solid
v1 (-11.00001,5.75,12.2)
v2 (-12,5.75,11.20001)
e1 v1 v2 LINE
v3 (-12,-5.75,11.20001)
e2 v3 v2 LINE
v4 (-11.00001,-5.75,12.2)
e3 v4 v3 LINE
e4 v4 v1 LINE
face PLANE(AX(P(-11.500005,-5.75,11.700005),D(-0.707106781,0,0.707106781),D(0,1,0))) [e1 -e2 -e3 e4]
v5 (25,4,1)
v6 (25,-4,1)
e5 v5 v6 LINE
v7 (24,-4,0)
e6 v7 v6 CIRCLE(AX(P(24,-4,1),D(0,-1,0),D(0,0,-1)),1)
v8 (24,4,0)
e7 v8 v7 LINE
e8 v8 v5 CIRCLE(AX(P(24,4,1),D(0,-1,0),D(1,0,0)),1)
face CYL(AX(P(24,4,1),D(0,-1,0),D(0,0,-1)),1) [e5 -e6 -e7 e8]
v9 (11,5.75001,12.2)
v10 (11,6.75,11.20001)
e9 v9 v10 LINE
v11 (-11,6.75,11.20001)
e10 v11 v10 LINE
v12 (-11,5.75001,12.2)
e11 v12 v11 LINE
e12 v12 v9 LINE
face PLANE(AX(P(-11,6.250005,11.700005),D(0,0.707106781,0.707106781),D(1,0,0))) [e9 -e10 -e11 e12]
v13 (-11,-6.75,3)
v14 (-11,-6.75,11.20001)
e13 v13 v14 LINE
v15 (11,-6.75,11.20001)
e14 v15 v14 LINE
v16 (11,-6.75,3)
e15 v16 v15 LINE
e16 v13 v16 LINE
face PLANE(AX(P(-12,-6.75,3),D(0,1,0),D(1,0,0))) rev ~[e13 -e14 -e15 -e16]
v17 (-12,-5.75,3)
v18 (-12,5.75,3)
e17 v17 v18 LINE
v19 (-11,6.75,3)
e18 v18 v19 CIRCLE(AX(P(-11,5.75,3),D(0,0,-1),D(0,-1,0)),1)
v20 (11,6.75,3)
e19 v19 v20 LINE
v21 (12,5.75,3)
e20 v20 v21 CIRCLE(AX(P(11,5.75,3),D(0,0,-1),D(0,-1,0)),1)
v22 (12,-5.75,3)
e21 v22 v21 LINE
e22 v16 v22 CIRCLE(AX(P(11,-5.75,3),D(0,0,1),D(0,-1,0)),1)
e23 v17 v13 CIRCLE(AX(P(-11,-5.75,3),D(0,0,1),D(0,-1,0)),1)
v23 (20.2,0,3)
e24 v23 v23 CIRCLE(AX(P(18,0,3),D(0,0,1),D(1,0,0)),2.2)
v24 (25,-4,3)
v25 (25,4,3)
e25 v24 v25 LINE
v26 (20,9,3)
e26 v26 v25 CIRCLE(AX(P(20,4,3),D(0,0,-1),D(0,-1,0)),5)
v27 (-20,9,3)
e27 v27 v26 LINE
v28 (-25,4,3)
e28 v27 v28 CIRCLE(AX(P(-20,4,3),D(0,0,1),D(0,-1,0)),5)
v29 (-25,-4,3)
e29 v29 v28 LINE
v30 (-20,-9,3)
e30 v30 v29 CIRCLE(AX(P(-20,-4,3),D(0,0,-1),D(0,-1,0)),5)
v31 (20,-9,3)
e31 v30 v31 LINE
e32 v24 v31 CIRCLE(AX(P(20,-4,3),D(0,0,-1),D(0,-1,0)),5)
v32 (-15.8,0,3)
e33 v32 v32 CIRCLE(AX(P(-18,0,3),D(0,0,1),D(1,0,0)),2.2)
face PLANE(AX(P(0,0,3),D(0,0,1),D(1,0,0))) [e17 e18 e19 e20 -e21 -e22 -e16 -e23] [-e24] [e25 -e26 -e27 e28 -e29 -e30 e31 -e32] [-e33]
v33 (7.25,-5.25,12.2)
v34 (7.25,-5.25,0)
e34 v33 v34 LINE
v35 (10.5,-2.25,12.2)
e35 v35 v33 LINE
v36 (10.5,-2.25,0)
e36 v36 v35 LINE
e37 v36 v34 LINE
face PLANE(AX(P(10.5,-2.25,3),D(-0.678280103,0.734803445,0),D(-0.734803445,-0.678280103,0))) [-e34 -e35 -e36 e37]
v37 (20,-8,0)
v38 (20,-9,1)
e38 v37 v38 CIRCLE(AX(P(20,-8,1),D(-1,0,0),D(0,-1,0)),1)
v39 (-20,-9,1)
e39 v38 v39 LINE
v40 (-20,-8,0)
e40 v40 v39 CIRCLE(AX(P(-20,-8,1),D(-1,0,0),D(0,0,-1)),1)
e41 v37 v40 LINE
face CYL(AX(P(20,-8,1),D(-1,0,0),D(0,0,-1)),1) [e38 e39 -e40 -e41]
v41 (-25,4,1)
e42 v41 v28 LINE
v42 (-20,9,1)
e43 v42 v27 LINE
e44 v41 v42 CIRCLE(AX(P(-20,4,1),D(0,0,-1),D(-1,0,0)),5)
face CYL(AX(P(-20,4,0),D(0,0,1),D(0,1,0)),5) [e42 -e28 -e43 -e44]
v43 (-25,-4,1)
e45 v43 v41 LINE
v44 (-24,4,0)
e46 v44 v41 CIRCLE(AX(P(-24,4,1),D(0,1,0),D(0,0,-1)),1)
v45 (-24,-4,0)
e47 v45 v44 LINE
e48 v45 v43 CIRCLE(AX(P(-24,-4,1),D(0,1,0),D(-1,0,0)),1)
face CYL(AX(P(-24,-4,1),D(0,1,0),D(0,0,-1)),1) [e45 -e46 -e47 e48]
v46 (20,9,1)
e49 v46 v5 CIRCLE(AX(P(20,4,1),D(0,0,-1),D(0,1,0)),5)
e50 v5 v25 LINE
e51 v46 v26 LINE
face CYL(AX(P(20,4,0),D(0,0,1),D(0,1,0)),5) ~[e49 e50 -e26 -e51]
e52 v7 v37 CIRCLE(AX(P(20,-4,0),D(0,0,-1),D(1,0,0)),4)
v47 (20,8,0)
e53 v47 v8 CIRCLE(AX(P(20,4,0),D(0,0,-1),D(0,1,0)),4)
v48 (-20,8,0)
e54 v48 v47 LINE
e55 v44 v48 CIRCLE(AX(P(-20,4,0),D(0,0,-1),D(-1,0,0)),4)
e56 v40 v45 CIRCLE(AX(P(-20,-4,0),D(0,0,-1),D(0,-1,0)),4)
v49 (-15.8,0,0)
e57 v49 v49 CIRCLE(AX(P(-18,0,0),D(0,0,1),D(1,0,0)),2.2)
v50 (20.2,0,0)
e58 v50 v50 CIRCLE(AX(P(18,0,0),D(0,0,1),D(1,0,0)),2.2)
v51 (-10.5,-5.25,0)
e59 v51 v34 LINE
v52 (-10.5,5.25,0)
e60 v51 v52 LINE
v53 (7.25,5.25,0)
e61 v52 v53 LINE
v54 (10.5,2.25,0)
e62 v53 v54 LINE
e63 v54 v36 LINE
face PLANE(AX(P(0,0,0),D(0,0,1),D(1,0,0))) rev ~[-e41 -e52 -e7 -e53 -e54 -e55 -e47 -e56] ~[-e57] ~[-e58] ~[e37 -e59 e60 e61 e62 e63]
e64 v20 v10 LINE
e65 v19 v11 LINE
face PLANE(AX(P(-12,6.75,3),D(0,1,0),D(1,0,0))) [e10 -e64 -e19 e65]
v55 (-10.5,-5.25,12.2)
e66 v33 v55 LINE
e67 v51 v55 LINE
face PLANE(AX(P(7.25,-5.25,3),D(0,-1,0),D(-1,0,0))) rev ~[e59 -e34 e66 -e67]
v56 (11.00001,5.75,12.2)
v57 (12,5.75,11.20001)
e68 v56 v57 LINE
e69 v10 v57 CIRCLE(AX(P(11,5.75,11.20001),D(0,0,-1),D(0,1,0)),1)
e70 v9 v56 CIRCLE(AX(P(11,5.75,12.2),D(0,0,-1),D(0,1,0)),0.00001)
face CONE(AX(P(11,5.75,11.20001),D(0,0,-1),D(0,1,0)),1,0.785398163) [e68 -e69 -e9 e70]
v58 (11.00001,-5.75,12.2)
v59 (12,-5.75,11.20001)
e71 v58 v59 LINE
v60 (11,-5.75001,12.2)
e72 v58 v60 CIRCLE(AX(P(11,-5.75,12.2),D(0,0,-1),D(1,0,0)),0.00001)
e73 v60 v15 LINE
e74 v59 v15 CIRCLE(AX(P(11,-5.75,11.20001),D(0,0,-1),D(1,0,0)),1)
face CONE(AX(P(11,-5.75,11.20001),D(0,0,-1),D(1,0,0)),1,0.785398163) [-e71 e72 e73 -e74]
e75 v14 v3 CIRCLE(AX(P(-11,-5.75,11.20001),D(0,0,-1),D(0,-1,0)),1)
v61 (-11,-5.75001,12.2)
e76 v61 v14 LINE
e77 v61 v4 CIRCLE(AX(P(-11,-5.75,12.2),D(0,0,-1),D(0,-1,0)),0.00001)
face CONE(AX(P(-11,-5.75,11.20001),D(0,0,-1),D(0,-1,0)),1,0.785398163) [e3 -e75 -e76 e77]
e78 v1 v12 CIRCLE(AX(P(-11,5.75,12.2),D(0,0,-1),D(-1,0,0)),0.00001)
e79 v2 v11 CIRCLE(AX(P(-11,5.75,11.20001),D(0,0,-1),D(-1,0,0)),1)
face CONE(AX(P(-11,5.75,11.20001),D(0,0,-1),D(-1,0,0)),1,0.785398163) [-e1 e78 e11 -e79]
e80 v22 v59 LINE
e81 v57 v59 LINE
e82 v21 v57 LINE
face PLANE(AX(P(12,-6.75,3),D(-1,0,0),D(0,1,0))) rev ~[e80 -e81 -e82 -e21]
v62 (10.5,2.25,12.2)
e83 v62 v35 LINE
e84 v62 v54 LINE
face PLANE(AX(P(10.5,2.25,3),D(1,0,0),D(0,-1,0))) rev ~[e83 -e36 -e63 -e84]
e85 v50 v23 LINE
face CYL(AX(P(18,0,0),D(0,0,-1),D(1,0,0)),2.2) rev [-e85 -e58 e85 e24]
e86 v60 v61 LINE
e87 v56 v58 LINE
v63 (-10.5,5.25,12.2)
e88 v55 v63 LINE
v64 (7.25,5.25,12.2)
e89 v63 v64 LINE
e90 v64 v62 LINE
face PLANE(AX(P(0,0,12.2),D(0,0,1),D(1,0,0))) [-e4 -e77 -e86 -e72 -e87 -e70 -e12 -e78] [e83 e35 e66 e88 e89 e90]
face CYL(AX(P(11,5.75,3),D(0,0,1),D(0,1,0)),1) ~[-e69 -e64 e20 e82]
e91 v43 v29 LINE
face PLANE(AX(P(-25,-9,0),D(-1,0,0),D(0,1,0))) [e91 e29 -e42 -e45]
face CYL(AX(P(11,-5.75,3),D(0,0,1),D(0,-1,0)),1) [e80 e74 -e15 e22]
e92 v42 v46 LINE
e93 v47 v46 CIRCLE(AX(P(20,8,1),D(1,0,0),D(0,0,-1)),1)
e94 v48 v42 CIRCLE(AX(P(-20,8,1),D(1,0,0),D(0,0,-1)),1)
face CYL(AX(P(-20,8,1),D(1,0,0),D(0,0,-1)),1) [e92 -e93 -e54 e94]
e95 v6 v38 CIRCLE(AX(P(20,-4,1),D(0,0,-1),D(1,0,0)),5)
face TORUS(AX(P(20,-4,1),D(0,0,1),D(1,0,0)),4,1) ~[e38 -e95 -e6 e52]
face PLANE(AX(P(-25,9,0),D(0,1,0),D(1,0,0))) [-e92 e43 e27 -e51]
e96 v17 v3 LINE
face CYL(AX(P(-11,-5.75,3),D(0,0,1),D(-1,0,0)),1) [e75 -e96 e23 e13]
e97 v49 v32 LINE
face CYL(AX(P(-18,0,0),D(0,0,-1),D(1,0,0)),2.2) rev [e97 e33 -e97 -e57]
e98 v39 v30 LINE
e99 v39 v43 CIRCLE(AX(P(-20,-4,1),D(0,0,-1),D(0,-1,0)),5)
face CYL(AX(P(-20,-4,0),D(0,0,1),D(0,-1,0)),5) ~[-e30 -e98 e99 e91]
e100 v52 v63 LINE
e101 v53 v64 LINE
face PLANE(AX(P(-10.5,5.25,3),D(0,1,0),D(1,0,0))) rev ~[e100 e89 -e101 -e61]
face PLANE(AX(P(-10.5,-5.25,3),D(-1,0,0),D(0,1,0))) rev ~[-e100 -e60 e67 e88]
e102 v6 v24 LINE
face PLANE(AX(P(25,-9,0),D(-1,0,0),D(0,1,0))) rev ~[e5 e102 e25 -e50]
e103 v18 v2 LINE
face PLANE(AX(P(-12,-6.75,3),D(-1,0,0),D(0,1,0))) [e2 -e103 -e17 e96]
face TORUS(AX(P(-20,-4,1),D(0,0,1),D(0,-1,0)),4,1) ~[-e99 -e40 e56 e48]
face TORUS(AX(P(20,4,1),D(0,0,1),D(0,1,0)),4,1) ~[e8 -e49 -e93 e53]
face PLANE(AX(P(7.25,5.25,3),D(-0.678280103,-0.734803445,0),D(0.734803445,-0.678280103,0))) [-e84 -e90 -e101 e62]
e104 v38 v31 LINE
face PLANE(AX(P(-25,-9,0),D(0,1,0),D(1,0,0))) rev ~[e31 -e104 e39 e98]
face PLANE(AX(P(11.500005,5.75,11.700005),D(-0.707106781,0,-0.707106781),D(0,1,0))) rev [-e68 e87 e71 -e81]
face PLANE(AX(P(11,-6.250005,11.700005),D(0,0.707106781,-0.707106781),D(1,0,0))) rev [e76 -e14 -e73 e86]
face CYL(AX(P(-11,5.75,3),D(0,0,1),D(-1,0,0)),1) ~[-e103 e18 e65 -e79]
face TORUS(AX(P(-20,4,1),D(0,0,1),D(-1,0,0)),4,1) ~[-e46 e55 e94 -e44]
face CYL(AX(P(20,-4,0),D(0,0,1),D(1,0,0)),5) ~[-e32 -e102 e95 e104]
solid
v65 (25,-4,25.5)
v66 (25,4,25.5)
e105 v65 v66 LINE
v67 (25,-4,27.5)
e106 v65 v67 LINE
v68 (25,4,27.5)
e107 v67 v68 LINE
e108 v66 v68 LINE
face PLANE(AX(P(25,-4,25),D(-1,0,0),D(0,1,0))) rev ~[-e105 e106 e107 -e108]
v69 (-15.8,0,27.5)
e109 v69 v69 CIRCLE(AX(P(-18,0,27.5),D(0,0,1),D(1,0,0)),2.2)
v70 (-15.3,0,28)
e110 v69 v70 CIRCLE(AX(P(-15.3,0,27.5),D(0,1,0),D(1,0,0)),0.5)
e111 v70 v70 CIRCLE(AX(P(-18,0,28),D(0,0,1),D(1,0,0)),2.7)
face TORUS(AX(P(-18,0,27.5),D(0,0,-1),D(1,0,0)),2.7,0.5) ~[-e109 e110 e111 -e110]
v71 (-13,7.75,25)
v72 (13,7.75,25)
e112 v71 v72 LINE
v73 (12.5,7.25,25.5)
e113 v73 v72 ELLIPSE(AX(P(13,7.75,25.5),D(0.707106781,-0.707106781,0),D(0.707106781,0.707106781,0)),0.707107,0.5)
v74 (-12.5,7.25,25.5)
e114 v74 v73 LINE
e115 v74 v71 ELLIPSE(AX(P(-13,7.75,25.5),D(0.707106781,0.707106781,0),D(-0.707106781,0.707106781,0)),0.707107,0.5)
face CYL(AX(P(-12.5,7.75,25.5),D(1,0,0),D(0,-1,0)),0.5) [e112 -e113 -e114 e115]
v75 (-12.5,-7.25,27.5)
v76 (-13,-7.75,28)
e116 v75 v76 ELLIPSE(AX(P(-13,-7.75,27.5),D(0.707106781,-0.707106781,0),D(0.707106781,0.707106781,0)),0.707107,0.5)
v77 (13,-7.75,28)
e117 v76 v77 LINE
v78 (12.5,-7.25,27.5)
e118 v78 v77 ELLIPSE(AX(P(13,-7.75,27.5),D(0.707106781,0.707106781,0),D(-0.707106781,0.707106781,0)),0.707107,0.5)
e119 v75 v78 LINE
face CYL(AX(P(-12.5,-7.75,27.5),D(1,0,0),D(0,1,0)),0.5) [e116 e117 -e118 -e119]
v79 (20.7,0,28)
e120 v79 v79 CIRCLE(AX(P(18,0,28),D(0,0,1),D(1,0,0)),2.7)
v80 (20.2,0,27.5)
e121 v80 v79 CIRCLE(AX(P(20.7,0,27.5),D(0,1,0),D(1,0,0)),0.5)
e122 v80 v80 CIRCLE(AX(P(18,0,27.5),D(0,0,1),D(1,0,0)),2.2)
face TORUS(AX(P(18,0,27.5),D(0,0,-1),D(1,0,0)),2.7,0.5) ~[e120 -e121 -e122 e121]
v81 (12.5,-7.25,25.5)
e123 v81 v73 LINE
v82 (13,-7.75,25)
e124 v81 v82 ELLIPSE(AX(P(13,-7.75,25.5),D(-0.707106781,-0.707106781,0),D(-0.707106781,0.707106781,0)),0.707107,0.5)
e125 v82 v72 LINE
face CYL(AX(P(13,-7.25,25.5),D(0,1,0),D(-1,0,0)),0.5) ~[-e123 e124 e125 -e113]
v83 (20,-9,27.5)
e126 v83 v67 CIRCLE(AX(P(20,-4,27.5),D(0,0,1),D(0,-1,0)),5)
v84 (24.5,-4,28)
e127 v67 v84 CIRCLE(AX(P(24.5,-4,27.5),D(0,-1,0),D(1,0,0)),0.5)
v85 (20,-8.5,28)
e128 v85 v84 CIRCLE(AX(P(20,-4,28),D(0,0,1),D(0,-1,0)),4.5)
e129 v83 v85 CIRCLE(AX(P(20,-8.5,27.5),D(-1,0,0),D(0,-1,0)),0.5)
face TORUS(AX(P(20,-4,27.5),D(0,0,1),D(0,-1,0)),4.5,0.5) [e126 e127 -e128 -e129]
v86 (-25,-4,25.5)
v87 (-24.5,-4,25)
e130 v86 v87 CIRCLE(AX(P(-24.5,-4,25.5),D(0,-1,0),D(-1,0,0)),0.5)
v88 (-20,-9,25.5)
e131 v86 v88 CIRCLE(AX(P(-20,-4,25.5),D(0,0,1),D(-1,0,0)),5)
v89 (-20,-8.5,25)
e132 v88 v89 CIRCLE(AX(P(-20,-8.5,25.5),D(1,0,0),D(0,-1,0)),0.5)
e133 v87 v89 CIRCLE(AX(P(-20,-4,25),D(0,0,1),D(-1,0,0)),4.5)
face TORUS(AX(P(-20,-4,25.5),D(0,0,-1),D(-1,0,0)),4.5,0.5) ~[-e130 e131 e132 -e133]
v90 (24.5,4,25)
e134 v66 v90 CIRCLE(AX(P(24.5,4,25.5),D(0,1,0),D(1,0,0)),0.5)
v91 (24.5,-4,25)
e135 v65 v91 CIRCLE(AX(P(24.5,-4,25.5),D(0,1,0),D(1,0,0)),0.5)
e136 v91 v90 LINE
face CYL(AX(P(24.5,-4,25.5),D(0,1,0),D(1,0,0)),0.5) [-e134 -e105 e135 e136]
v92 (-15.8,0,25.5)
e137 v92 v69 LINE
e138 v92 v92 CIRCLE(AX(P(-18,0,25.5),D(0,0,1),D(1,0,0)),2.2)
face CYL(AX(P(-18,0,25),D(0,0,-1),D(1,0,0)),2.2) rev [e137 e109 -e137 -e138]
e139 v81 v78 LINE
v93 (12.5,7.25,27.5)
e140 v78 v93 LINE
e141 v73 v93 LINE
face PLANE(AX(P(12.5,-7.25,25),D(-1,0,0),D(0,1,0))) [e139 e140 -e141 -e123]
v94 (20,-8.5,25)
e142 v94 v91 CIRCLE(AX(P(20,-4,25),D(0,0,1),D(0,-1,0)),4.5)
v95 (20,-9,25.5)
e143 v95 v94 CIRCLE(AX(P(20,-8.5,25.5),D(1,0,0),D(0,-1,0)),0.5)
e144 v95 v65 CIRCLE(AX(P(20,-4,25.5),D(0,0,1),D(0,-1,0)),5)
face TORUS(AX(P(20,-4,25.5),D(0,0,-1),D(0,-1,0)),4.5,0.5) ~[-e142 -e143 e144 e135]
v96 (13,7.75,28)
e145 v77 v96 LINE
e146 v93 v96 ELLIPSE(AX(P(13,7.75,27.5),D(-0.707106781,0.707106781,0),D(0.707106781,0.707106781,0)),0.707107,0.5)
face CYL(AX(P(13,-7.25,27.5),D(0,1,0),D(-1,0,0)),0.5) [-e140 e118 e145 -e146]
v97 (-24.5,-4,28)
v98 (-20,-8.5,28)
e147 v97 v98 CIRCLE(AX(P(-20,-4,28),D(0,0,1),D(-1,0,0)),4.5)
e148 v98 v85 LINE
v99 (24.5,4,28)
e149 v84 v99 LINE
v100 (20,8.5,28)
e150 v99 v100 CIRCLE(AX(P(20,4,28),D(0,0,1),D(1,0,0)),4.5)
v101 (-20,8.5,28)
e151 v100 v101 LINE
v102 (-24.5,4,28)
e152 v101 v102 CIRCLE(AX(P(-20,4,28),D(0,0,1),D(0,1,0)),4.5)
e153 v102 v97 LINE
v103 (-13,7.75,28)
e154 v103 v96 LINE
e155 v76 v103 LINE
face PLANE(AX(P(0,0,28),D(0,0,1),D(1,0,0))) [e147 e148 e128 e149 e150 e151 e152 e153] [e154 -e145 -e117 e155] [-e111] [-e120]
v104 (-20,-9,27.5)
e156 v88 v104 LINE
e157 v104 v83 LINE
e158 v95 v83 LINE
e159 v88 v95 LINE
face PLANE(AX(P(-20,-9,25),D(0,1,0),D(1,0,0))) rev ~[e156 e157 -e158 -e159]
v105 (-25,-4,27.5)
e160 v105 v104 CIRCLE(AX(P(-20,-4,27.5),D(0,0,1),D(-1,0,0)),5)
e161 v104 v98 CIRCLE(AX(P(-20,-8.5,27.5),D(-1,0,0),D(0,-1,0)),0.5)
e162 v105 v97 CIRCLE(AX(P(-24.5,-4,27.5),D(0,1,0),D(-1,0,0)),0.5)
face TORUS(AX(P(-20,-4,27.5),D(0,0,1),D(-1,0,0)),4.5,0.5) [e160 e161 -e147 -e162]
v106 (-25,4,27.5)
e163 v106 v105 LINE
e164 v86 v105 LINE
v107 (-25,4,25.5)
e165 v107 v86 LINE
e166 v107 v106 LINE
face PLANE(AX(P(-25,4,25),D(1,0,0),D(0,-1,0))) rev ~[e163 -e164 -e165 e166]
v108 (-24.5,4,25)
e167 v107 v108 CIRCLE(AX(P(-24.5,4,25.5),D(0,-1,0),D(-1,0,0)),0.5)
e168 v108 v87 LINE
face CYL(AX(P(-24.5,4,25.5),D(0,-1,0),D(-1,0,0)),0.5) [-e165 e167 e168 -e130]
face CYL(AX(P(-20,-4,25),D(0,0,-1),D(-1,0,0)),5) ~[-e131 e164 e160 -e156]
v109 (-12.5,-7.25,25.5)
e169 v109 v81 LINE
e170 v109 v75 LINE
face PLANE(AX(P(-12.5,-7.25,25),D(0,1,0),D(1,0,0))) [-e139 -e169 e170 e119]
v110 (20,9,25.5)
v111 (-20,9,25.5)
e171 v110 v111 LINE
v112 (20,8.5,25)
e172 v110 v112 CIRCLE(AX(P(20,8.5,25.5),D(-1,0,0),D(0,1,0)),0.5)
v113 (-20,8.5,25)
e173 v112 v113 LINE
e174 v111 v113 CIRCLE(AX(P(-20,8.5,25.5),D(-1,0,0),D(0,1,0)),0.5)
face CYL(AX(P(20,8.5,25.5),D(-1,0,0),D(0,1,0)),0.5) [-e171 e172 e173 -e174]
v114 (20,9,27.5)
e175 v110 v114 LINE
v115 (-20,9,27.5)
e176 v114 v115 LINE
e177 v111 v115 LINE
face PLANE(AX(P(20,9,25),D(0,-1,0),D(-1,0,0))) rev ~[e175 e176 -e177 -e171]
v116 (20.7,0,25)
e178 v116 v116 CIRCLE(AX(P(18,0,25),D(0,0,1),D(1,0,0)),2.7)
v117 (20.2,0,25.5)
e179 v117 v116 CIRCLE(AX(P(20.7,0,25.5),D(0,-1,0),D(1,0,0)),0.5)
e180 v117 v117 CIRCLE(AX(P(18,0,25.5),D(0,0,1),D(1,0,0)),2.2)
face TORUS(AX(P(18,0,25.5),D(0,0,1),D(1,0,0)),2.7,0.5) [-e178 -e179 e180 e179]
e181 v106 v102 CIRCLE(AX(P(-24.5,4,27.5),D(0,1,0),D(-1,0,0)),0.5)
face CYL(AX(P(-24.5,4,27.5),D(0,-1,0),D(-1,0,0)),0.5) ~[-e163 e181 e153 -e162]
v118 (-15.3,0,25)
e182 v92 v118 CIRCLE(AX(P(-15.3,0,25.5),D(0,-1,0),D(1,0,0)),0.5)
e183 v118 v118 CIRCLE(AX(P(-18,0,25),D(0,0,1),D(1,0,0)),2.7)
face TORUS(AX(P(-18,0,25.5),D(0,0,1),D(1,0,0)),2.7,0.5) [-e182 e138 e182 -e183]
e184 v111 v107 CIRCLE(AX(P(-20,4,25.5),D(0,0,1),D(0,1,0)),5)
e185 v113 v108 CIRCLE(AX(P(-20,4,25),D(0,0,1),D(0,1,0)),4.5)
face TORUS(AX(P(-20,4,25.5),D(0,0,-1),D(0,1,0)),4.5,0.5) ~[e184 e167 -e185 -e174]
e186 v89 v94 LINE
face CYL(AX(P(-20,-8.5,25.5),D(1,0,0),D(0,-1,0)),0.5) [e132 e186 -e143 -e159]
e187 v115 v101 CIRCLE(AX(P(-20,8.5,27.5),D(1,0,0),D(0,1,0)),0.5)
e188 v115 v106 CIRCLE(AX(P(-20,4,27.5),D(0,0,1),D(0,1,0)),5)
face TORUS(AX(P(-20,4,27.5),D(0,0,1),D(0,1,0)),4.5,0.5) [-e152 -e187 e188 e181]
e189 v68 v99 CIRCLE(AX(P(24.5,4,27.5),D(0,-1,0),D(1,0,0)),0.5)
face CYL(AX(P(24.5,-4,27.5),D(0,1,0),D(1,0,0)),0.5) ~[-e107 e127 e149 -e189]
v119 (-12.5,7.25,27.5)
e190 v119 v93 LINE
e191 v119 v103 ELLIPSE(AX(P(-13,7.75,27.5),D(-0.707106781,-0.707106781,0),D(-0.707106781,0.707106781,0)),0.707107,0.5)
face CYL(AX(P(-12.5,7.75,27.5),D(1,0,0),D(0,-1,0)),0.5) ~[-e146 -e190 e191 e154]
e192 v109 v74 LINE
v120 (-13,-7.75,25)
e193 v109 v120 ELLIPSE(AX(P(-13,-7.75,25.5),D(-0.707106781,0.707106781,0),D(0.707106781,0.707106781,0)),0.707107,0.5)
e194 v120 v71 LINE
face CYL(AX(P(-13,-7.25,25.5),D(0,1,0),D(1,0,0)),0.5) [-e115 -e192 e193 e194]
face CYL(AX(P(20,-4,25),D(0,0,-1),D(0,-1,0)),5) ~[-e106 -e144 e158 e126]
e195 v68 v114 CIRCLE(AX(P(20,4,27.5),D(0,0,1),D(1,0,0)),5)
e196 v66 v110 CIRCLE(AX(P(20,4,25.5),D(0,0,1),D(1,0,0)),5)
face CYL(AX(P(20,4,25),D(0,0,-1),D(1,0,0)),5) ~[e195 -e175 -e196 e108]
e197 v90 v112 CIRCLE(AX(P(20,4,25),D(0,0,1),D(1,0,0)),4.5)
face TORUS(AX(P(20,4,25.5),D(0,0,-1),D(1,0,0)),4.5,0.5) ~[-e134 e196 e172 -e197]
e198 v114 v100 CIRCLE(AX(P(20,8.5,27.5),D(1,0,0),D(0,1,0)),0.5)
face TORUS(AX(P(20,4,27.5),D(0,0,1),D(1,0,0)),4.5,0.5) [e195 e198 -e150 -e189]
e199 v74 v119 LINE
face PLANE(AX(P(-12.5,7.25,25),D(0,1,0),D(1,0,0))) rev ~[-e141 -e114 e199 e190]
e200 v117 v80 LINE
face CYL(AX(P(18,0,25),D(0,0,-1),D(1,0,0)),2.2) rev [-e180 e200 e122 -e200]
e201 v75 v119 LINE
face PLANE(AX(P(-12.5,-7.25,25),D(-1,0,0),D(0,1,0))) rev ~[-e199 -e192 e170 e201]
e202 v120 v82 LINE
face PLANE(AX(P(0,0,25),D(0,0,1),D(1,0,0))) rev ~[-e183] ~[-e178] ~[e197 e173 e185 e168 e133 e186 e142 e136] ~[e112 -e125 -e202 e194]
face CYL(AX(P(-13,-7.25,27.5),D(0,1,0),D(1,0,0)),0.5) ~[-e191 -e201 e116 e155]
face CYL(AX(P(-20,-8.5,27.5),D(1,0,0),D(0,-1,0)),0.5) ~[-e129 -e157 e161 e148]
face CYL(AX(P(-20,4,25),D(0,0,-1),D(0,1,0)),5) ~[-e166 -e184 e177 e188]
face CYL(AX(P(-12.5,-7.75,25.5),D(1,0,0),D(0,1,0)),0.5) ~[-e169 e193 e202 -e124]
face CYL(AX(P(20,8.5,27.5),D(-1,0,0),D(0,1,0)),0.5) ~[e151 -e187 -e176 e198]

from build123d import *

# Parameters (mm, degrees)
F0_W          = 50
F0_H          = 18
F0_R          = 2.2
F0_W_2        = 21
F0_H_2        = 10.5
F1_DEPTH      = 3
F2_W          = 24
F2_H          = 13.5
F3_DEPTH      = 9.2
F3_DEPTH_BACK = 3
F4_R          = 5
F5_R          = 1
F7_R          = 1
F8_SIZE       = 0.99999
F10_START     = 22
F9_R          = 2.2
F9_W          = 25
F9_H          = 14.5
F10_DEPTH     = 3
F11_R         = 0.5


# Not quite as in the source:
# - a fillet or chamfer is up to 0.001 mm smaller than in the source, because OpenCascade refuses the exact size


with BuildPart() as f1:
    # F0 (on Top) → F1 (new body)
    with BuildSketch(Plane.XY):
        Rectangle(F0_W, F0_H)
        with Locations((-18, 0)):
            Circle(F0_R, mode=Mode.SUBTRACT)
        Rectangle(F0_W_2, F0_H_2, mode=Mode.SUBTRACT)
        with Locations((18, 0)):
            Circle(F0_R, mode=Mode.SUBTRACT)
    extrude(amount=F1_DEPTH)

    # F2 (on face) → F3 (join, two sides)
    with BuildSketch(Plane.XY.offset(3)) as f3_sk:
        Rectangle(F2_W, F2_H)
        Polygon((-10.5, 5.25), (7.25, 5.25), (10.5, 2.25), (10.5, -2.25), (7.25, -5.25), (-10.5, -5.25), align=None, mode=Mode.SUBTRACT)
    extrude(amount=F3_DEPTH)
    extrude(f3_sk.sketch, amount=-F3_DEPTH_BACK)

    # F4
    f4_edges = [f1.edges().sort_by_distance(p)[0] for p in [
        (-25, -9, 1.5),
        (-25, 9, 1.5),
        (25, 9, 1.5),
        (25, -9, 1.5),
    ]]
    fillet(f4_edges, radius=F4_R)

    # F5
    f5_edges = [f1.edges().sort_by_distance(p)[0] for p in [
        (0, 9, 0),
    ]]
    fillet(f5_edges, radius=F5_R)

    # F7
    f7_edges = [f1.edges().sort_by_distance(p)[0] for p in [
        (-12, 6.75, 7.6),
        (12, 6.75, 7.6),
        (12, -6.75, 7.6),
        (-12, -6.75, 7.6),
    ]]
    fillet(f7_edges, radius=F7_R)

    # F8 (size 1 in the source; OpenCascade refuses exactly that, so slightly less here)
    f8_edges = [f1.edges().sort_by_distance(p)[0] for p in [
        (0, 6.75, 12.2),
        (-11.707107, 6.457107, 12.2),
        (-12, 0, 12.2),
    ]]
    chamfer(f8_edges, length=F8_SIZE)


with BuildPart() as f10:
    # F9 (on face) → F10 (new body)
    with BuildSketch(Plane.XY.offset(3).offset(F10_START)):
        with BuildLine():
            ThreePointArc((25, 4), (23.5355339059, 7.5355339059), (20, 9))
            Line((20, 9), (-20, 9))
            ThreePointArc((-20, 9), (-23.5355339059, 7.5355339059), (-25, 4))
            Line((-25, 4), (-25, -4))
            ThreePointArc((-25, -4), (-23.5355339059, -7.5355339059), (-20, -9))
            Line((-20, -9), (20, -9))
            ThreePointArc((20, -9), (23.5355339059, -7.5355339059), (25, -4))
            Line((25, -4), (25, 4))
        make_face()
        with Locations((-18, 0)):
            Circle(F9_R, mode=Mode.SUBTRACT)
        Rectangle(F9_W, F9_H, mode=Mode.SUBTRACT)
        with Locations((18, 0)):
            Circle(F9_R, mode=Mode.SUBTRACT)
    extrude(amount=F10_DEPTH)

    # F11
    f11_edges = [f10.edges().sort_by_distance(p)[0] for p in [
        (23.535534, 7.535534, 25),
        (0, 9, 25),
        (-23.535534, 7.535534, 25),
        (-25, 0, 25),
        (-23.535534, -7.535534, 25),
        (0, -9, 25),
        (23.535534, -7.535534, 25),
        (25, 0, 25),
        (-20.2, 0, 25),
        (-12.5, 0, 25),
        (0, 7.25, 25),
        (12.5, 0, 25),
        (0, -7.25, 25),
        (15.8, 0, 25),
        (23.535534, 7.535534, 28),
        (0, 9, 28),
        (-23.535534, 7.535534, 28),
        (-25, 0, 28),
        (-23.535534, -7.535534, 28),
        (0, -9, 28),
        (23.535534, -7.535534, 28),
        (25, 0, 28),
        (-20.2, 0, 28),
        (-12.5, 0, 28),
        (0, 7.25, 28),
        (12.5, 0, 28),
        (0, -7.25, 28),
        (15.8, 0, 28),
    ]]
    fillet(f11_edges, radius=F11_R)


solid = Compound([f1.part, f10.part])
